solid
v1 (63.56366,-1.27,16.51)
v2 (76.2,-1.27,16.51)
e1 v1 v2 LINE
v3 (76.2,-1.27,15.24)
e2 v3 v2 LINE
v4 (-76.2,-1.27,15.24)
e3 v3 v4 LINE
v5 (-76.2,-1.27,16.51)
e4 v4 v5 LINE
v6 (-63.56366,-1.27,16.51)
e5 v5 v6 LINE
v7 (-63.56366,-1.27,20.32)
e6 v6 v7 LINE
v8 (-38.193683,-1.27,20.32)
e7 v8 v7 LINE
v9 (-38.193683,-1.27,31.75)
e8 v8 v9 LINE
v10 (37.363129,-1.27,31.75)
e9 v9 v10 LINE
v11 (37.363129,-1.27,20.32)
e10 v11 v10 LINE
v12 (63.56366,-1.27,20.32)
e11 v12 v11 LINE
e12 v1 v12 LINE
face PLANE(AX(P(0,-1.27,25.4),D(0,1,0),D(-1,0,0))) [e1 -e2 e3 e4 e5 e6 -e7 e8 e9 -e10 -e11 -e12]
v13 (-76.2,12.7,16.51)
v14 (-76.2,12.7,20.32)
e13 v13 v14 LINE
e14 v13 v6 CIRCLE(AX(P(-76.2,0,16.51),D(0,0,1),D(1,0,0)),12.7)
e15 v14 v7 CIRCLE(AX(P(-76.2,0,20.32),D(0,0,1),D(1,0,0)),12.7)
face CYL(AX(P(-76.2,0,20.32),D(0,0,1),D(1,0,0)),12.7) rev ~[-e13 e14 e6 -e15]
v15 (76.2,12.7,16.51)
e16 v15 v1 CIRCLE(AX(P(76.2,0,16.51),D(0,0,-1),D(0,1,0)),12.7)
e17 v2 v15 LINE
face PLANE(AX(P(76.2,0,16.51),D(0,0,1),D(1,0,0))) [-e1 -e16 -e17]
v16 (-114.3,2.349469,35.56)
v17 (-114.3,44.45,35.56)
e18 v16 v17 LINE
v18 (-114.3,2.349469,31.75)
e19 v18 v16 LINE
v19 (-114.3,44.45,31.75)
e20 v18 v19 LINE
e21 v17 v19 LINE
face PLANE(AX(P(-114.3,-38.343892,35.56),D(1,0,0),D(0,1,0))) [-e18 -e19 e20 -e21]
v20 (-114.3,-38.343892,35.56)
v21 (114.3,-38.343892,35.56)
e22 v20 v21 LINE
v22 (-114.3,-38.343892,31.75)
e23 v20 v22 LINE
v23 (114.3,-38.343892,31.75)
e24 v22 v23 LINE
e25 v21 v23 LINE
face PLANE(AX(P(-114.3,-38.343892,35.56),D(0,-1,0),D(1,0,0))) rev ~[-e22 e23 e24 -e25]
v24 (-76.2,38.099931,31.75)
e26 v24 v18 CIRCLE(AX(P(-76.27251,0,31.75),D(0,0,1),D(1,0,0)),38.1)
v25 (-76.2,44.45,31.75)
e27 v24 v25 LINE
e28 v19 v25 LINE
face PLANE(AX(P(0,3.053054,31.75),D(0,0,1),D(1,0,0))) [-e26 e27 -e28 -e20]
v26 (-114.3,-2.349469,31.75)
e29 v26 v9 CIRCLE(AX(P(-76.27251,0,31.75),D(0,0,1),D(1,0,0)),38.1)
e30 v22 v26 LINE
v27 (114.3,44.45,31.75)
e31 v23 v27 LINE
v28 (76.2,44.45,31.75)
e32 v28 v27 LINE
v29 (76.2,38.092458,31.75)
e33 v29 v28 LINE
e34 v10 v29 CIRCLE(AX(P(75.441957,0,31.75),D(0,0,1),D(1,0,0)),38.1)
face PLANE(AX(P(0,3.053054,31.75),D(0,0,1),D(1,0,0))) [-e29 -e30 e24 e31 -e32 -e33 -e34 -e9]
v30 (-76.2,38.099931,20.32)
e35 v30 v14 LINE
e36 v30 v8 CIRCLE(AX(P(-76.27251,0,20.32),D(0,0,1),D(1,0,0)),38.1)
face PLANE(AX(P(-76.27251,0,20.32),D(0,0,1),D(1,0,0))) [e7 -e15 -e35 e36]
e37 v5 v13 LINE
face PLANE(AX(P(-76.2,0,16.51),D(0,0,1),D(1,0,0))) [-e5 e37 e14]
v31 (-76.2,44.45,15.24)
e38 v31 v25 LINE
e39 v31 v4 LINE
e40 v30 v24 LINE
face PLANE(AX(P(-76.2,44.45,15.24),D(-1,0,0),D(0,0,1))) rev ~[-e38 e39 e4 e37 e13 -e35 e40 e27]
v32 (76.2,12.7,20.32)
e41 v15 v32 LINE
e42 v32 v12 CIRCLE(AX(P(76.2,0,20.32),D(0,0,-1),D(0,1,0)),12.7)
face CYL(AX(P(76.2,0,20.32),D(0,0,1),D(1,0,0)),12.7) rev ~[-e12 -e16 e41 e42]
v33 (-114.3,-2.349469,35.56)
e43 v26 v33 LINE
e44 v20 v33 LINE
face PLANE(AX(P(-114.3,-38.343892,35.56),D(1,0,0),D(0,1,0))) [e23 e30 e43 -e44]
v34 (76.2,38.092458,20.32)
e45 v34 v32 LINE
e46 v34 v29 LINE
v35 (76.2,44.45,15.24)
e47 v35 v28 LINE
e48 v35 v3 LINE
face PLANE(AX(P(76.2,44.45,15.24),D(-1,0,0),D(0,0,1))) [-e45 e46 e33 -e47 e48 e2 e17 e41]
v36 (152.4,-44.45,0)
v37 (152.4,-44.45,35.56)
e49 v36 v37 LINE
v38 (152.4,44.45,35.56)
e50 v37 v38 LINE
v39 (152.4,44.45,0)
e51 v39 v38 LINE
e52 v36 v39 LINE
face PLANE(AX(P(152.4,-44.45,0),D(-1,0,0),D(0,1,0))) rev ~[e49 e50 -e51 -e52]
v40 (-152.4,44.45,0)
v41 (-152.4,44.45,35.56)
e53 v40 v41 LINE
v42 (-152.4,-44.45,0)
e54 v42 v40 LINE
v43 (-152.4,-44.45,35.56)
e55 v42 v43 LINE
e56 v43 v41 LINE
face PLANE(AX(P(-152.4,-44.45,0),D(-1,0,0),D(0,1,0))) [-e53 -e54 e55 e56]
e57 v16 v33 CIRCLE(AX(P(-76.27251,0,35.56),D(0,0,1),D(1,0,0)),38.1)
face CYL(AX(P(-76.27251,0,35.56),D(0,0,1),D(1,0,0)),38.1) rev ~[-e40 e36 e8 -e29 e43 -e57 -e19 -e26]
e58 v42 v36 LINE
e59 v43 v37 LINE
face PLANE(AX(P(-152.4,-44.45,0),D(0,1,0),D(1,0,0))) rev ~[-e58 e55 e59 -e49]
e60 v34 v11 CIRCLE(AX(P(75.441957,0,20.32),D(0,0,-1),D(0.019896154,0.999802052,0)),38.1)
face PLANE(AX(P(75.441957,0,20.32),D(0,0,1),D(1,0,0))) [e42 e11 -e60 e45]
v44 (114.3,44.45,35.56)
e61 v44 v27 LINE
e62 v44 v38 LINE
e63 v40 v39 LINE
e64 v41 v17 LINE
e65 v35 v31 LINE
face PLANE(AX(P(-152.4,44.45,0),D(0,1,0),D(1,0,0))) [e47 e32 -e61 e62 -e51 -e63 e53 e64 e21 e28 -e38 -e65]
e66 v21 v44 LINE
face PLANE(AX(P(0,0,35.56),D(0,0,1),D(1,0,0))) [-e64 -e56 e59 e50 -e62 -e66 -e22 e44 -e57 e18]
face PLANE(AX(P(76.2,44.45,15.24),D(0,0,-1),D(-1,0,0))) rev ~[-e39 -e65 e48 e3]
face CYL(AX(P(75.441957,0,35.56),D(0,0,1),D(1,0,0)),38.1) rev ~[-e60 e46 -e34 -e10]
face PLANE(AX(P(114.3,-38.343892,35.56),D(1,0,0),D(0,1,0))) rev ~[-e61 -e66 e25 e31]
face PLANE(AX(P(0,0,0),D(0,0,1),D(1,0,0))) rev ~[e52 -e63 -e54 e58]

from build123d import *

# Parameters (mm, degrees)
F0_W      = 304.8
F0_H      = 88.9
F1_DEPTH  = 35.56
F2_R      = 38.1
F3_DEPTH  = 15.24
F4_R      = 38.1
F5_DEPTH  = 15.24
F6_W      = 152.4
F6_H      = 20.32
F7_DEPTH  = 45.72
F8_W      = 228.6
F8_H      = 82.7938915014
F9_DEPTH  = 3.81
F10_R     = 12.7
F11_DEPTH = 3.81
F12_R     = 12.7
F13_DEPTH = 3.81


# Not quite as in the source:
# - a feature of the source that left no trace in its solid (it failed there, or was rolled back) is left out


with BuildPart() as f1:
    # F0 (on Top) → F1 (new body)
    with BuildSketch(Plane.XY):
        Rectangle(F0_W, F0_H)
    extrude(amount=F1_DEPTH)

    # F2 (on face) → F3 (cut)
    with BuildSketch(Plane.XY.offset(35.56)):
        with Locations((75.4419565201, 0)):
            Circle(F2_R)
    extrude(amount=-F3_DEPTH, mode=Mode.SUBTRACT)

    # F4 (on face) → F5 (cut)
    with BuildSketch(Plane.XY.offset(35.56)):
        with Locations((-76.2725099921, 0)):
            Circle(F4_R)
    extrude(amount=-F5_DEPTH, mode=Mode.SUBTRACT)

    # F6 (on face) → F7 (cut)
    with BuildSketch(Plane(origin=(0, 44.45, 0), x_dir=(-1, 0, 0), z_dir=(0, 1, 0))):
        with Locations((0, 25.4)):
            Rectangle(F6_W, F6_H)
    extrude(amount=-F7_DEPTH, mode=Mode.SUBTRACT)

    # F8 (on face) → F9 (cut)
    with BuildSketch(Plane.XY.offset(35.56)):
        with Locations((0, 3.0530542493)):
            Rectangle(F8_W, F8_H)
    extrude(amount=-F9_DEPTH, mode=Mode.SUBTRACT)

    # F10 (on face) → F11 (cut)
    with BuildSketch(Plane.XY.offset(20.32)):
        with Locations((-76.2, 0)):
            Circle(F10_R)
    extrude(amount=-F11_DEPTH, mode=Mode.SUBTRACT)

    # F12 (on face) → F13 (cut)
    with BuildSketch(Plane.XY.offset(20.32)):
        with Locations((76.2, 0)):
            Circle(F12_R)
    extrude(amount=-F13_DEPTH, mode=Mode.SUBTRACT)


solid = f1.part
